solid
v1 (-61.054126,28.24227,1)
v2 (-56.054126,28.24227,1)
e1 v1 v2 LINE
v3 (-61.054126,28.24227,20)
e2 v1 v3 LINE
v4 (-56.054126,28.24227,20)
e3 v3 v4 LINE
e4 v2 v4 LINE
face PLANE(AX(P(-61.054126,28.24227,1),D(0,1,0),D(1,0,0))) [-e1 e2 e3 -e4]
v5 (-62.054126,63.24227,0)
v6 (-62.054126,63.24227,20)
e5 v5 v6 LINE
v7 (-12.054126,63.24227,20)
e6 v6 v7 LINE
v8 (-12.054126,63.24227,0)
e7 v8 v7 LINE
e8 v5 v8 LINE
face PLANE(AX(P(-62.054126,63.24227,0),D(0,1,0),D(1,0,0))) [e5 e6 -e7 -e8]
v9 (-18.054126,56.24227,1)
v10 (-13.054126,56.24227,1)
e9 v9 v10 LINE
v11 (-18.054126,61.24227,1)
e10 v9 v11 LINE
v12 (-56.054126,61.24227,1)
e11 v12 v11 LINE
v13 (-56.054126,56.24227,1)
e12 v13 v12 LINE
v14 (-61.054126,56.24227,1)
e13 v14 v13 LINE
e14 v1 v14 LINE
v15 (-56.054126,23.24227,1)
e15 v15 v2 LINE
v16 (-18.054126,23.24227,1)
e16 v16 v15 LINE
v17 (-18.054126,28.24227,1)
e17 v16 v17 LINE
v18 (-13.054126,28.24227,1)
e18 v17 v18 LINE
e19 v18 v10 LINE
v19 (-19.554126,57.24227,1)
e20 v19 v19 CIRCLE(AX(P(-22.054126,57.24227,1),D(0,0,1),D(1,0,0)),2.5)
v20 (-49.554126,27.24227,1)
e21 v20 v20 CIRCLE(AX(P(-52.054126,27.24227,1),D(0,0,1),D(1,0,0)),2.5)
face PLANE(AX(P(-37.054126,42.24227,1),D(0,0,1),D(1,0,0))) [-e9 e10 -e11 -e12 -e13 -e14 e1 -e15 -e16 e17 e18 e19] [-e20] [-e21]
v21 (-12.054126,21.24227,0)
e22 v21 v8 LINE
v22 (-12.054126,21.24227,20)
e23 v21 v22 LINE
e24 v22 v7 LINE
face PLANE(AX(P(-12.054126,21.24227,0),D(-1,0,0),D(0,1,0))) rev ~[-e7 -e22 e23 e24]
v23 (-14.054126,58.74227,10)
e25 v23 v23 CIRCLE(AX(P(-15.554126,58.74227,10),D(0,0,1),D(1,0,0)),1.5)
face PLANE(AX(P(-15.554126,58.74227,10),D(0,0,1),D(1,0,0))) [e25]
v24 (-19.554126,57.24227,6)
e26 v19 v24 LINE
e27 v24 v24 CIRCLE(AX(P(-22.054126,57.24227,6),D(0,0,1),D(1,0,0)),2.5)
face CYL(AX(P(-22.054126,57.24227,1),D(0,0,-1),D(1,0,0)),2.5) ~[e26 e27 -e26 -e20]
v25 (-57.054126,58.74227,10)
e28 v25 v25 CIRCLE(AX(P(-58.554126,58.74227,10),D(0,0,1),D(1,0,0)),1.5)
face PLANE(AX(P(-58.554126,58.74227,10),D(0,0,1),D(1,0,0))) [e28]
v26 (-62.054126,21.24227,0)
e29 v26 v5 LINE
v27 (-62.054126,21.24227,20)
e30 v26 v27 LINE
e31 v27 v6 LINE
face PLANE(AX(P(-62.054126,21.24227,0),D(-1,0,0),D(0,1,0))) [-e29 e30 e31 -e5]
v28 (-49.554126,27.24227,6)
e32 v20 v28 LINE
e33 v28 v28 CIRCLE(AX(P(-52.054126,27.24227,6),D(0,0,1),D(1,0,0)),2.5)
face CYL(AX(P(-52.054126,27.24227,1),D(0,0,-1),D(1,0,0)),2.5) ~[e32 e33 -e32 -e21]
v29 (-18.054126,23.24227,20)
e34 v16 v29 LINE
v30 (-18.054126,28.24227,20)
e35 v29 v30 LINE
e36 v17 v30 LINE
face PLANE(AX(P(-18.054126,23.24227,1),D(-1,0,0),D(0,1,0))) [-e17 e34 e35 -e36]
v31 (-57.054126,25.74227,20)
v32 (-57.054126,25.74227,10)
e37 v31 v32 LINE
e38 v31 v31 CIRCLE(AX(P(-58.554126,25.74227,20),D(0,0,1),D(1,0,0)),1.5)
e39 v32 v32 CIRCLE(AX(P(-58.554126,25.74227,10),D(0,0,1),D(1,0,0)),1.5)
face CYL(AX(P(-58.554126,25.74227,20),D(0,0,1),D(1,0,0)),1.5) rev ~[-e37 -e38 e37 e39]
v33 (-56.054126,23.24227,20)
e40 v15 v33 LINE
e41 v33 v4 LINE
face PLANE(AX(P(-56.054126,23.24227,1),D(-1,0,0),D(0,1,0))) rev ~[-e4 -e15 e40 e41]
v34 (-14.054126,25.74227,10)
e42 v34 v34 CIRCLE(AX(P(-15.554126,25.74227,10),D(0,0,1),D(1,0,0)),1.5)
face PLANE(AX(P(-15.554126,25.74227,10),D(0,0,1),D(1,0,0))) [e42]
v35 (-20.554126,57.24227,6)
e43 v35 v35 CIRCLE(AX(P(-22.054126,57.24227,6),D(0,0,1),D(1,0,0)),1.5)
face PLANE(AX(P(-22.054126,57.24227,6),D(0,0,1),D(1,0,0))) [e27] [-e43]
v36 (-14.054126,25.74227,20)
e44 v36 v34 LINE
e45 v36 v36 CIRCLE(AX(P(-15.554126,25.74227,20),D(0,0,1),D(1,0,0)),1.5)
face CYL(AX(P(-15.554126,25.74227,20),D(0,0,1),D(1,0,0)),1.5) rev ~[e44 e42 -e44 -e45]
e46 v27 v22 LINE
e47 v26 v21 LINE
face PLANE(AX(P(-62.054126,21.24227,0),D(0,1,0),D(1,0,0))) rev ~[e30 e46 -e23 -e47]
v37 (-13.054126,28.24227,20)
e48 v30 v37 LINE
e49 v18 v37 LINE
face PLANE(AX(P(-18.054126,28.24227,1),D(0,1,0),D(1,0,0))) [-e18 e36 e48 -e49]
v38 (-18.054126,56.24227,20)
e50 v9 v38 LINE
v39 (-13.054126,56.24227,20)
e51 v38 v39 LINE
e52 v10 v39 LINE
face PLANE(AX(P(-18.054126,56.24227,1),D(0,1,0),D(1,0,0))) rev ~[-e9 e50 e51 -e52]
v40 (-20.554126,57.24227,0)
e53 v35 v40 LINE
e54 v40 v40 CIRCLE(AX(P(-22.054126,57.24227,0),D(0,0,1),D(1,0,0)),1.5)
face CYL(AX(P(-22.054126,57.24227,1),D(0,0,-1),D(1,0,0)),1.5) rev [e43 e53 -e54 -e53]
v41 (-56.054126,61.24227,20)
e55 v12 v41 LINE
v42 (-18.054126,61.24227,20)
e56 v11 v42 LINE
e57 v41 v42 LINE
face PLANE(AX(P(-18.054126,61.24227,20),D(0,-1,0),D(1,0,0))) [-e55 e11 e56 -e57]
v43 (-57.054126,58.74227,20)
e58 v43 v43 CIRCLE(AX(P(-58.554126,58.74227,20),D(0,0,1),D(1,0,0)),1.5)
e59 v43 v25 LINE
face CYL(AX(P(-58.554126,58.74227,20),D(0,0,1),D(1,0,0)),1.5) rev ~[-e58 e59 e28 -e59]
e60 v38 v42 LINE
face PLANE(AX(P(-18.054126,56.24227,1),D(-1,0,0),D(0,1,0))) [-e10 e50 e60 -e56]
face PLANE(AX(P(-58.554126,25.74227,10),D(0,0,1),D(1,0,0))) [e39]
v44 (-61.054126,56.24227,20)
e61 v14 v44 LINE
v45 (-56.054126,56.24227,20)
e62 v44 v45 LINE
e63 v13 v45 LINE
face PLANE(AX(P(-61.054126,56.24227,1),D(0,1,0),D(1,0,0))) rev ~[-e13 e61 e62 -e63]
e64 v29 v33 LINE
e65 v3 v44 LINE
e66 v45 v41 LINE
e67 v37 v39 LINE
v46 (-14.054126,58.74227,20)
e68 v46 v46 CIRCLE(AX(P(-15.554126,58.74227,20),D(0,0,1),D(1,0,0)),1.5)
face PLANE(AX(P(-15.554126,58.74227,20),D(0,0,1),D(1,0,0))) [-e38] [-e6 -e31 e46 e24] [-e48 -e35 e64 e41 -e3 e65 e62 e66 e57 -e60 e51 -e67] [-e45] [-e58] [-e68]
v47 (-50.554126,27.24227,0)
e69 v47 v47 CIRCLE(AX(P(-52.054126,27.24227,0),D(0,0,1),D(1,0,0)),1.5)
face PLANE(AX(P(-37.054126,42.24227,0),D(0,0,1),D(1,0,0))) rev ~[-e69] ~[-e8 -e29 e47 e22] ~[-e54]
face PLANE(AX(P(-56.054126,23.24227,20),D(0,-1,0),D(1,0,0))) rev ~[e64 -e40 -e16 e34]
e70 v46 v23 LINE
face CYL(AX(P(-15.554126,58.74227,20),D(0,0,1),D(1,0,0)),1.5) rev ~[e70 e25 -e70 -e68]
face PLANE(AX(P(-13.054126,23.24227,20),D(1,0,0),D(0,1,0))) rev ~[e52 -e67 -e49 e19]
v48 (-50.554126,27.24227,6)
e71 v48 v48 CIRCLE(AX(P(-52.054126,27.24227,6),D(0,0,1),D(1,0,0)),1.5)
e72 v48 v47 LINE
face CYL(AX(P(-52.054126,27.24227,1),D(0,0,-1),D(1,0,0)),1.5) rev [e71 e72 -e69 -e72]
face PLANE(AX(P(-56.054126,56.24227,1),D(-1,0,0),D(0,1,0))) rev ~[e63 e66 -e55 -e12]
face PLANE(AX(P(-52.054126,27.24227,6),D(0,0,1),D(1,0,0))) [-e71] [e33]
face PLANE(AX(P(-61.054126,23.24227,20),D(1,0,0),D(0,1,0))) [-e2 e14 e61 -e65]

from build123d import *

# Parameters (mm, degrees)
F0_W      = 50
F0_H      = 42
F1_DEPTH  = 20
F2_W      = 38
F2_H      = 38
F3_DEPTH  = 19
F4_W      = 5
F4_H      = 38
F5_DEPTH  = 19
F6_W      = 5
F6_H      = 5
F7_DEPTH  = 19
F8_R      = 1.5
F9_DEPTH  = 10
F10_R     = 2.5
F10_R_2   = 1.5
F11_DEPTH = 5
F12_DEPTH = 1


with BuildPart() as f1:
    # F0 (on Top) → F1 (new body)
    with BuildSketch(Plane.XY):
        with Locations((-37.0541260391, 42.2422697991)):
            Rectangle(F0_W, F0_H)
    extrude(amount=F1_DEPTH)

    # F2 (on face) → F3 (cut)
    with BuildSketch(Plane.XY.offset(20)):
        with Locations((-37.0541260391, 42.2422697991)):
            Rectangle(F2_W, F2_H)
    extrude(amount=-F3_DEPTH, mode=Mode.SUBTRACT)

    # F4 (on face) → F5 (cut)
    with BuildSketch(Plane.XY.offset(20)):
        with Locations((-15.5541260391, 42.2422697991)):
            Rectangle(F4_W, F4_H)
        with Locations((-58.5541260391, 42.2422697991)):
            Rectangle(F4_W, F4_H)
    extrude(amount=-F5_DEPTH, mode=Mode.SUBTRACT)

    # F6 (on face) → F7 (join)
    with BuildSketch(Plane.XY.offset(1)):
        with Locations((-15.5541260391, 58.7422697991)):
            Rectangle(F6_W, F6_H)
        with Locations((-15.5541260391, 25.7422697991)):
            Rectangle(F6_W, F6_H)
        with Locations((-58.5541260391, 58.7422697991)):
            Rectangle(F6_W, F6_H)
        with Locations((-58.5541260391, 25.7422697991)):
            Rectangle(F6_W, F6_H)
    extrude(amount=F7_DEPTH)

    # F8 (on face) → F9 (cut)
    with BuildSketch(Plane.XY.offset(20)):
        with Locations((-15.5541260391, 58.7422697991)):
            Circle(F8_R)
        with Locations((-15.5541260391, 25.7422697991)):
            Circle(F8_R)
        with Locations((-58.5541260391, 25.7422697991)):
            Circle(F8_R)
        with Locations((-58.5541260391, 58.7422697991)):
            Circle(F8_R)
    extrude(amount=-F9_DEPTH, mode=Mode.SUBTRACT)

    # F10 (on face) → F11 (join)
    with BuildSketch(Plane.XY.offset(1)):
        with Locations((-22.0541260391, 57.2422697991)):
            Circle(F10_R)
        with Locations((-22.0541260391, 57.2422697991)):
            Circle(F10_R_2, mode=Mode.SUBTRACT)
        with Locations((-52.0541260391, 27.2422697991)):
            Circle(F10_R)
        with Locations((-52.0541260391, 27.2422697991)):
            Circle(F10_R_2, mode=Mode.SUBTRACT)
    extrude(amount=F11_DEPTH)

    # F12 (cut): faces of the model
    f12_faces = [f1.faces().sort_by_distance(p)[0] for p in [
        (-22.0541260391, 57.2422697991, 1),
        (-52.0541260391, 27.2422697991, 1),
    ]]
    extrude(f12_faces, amount=-F12_DEPTH, mode=Mode.SUBTRACT)


solid = f1.part
